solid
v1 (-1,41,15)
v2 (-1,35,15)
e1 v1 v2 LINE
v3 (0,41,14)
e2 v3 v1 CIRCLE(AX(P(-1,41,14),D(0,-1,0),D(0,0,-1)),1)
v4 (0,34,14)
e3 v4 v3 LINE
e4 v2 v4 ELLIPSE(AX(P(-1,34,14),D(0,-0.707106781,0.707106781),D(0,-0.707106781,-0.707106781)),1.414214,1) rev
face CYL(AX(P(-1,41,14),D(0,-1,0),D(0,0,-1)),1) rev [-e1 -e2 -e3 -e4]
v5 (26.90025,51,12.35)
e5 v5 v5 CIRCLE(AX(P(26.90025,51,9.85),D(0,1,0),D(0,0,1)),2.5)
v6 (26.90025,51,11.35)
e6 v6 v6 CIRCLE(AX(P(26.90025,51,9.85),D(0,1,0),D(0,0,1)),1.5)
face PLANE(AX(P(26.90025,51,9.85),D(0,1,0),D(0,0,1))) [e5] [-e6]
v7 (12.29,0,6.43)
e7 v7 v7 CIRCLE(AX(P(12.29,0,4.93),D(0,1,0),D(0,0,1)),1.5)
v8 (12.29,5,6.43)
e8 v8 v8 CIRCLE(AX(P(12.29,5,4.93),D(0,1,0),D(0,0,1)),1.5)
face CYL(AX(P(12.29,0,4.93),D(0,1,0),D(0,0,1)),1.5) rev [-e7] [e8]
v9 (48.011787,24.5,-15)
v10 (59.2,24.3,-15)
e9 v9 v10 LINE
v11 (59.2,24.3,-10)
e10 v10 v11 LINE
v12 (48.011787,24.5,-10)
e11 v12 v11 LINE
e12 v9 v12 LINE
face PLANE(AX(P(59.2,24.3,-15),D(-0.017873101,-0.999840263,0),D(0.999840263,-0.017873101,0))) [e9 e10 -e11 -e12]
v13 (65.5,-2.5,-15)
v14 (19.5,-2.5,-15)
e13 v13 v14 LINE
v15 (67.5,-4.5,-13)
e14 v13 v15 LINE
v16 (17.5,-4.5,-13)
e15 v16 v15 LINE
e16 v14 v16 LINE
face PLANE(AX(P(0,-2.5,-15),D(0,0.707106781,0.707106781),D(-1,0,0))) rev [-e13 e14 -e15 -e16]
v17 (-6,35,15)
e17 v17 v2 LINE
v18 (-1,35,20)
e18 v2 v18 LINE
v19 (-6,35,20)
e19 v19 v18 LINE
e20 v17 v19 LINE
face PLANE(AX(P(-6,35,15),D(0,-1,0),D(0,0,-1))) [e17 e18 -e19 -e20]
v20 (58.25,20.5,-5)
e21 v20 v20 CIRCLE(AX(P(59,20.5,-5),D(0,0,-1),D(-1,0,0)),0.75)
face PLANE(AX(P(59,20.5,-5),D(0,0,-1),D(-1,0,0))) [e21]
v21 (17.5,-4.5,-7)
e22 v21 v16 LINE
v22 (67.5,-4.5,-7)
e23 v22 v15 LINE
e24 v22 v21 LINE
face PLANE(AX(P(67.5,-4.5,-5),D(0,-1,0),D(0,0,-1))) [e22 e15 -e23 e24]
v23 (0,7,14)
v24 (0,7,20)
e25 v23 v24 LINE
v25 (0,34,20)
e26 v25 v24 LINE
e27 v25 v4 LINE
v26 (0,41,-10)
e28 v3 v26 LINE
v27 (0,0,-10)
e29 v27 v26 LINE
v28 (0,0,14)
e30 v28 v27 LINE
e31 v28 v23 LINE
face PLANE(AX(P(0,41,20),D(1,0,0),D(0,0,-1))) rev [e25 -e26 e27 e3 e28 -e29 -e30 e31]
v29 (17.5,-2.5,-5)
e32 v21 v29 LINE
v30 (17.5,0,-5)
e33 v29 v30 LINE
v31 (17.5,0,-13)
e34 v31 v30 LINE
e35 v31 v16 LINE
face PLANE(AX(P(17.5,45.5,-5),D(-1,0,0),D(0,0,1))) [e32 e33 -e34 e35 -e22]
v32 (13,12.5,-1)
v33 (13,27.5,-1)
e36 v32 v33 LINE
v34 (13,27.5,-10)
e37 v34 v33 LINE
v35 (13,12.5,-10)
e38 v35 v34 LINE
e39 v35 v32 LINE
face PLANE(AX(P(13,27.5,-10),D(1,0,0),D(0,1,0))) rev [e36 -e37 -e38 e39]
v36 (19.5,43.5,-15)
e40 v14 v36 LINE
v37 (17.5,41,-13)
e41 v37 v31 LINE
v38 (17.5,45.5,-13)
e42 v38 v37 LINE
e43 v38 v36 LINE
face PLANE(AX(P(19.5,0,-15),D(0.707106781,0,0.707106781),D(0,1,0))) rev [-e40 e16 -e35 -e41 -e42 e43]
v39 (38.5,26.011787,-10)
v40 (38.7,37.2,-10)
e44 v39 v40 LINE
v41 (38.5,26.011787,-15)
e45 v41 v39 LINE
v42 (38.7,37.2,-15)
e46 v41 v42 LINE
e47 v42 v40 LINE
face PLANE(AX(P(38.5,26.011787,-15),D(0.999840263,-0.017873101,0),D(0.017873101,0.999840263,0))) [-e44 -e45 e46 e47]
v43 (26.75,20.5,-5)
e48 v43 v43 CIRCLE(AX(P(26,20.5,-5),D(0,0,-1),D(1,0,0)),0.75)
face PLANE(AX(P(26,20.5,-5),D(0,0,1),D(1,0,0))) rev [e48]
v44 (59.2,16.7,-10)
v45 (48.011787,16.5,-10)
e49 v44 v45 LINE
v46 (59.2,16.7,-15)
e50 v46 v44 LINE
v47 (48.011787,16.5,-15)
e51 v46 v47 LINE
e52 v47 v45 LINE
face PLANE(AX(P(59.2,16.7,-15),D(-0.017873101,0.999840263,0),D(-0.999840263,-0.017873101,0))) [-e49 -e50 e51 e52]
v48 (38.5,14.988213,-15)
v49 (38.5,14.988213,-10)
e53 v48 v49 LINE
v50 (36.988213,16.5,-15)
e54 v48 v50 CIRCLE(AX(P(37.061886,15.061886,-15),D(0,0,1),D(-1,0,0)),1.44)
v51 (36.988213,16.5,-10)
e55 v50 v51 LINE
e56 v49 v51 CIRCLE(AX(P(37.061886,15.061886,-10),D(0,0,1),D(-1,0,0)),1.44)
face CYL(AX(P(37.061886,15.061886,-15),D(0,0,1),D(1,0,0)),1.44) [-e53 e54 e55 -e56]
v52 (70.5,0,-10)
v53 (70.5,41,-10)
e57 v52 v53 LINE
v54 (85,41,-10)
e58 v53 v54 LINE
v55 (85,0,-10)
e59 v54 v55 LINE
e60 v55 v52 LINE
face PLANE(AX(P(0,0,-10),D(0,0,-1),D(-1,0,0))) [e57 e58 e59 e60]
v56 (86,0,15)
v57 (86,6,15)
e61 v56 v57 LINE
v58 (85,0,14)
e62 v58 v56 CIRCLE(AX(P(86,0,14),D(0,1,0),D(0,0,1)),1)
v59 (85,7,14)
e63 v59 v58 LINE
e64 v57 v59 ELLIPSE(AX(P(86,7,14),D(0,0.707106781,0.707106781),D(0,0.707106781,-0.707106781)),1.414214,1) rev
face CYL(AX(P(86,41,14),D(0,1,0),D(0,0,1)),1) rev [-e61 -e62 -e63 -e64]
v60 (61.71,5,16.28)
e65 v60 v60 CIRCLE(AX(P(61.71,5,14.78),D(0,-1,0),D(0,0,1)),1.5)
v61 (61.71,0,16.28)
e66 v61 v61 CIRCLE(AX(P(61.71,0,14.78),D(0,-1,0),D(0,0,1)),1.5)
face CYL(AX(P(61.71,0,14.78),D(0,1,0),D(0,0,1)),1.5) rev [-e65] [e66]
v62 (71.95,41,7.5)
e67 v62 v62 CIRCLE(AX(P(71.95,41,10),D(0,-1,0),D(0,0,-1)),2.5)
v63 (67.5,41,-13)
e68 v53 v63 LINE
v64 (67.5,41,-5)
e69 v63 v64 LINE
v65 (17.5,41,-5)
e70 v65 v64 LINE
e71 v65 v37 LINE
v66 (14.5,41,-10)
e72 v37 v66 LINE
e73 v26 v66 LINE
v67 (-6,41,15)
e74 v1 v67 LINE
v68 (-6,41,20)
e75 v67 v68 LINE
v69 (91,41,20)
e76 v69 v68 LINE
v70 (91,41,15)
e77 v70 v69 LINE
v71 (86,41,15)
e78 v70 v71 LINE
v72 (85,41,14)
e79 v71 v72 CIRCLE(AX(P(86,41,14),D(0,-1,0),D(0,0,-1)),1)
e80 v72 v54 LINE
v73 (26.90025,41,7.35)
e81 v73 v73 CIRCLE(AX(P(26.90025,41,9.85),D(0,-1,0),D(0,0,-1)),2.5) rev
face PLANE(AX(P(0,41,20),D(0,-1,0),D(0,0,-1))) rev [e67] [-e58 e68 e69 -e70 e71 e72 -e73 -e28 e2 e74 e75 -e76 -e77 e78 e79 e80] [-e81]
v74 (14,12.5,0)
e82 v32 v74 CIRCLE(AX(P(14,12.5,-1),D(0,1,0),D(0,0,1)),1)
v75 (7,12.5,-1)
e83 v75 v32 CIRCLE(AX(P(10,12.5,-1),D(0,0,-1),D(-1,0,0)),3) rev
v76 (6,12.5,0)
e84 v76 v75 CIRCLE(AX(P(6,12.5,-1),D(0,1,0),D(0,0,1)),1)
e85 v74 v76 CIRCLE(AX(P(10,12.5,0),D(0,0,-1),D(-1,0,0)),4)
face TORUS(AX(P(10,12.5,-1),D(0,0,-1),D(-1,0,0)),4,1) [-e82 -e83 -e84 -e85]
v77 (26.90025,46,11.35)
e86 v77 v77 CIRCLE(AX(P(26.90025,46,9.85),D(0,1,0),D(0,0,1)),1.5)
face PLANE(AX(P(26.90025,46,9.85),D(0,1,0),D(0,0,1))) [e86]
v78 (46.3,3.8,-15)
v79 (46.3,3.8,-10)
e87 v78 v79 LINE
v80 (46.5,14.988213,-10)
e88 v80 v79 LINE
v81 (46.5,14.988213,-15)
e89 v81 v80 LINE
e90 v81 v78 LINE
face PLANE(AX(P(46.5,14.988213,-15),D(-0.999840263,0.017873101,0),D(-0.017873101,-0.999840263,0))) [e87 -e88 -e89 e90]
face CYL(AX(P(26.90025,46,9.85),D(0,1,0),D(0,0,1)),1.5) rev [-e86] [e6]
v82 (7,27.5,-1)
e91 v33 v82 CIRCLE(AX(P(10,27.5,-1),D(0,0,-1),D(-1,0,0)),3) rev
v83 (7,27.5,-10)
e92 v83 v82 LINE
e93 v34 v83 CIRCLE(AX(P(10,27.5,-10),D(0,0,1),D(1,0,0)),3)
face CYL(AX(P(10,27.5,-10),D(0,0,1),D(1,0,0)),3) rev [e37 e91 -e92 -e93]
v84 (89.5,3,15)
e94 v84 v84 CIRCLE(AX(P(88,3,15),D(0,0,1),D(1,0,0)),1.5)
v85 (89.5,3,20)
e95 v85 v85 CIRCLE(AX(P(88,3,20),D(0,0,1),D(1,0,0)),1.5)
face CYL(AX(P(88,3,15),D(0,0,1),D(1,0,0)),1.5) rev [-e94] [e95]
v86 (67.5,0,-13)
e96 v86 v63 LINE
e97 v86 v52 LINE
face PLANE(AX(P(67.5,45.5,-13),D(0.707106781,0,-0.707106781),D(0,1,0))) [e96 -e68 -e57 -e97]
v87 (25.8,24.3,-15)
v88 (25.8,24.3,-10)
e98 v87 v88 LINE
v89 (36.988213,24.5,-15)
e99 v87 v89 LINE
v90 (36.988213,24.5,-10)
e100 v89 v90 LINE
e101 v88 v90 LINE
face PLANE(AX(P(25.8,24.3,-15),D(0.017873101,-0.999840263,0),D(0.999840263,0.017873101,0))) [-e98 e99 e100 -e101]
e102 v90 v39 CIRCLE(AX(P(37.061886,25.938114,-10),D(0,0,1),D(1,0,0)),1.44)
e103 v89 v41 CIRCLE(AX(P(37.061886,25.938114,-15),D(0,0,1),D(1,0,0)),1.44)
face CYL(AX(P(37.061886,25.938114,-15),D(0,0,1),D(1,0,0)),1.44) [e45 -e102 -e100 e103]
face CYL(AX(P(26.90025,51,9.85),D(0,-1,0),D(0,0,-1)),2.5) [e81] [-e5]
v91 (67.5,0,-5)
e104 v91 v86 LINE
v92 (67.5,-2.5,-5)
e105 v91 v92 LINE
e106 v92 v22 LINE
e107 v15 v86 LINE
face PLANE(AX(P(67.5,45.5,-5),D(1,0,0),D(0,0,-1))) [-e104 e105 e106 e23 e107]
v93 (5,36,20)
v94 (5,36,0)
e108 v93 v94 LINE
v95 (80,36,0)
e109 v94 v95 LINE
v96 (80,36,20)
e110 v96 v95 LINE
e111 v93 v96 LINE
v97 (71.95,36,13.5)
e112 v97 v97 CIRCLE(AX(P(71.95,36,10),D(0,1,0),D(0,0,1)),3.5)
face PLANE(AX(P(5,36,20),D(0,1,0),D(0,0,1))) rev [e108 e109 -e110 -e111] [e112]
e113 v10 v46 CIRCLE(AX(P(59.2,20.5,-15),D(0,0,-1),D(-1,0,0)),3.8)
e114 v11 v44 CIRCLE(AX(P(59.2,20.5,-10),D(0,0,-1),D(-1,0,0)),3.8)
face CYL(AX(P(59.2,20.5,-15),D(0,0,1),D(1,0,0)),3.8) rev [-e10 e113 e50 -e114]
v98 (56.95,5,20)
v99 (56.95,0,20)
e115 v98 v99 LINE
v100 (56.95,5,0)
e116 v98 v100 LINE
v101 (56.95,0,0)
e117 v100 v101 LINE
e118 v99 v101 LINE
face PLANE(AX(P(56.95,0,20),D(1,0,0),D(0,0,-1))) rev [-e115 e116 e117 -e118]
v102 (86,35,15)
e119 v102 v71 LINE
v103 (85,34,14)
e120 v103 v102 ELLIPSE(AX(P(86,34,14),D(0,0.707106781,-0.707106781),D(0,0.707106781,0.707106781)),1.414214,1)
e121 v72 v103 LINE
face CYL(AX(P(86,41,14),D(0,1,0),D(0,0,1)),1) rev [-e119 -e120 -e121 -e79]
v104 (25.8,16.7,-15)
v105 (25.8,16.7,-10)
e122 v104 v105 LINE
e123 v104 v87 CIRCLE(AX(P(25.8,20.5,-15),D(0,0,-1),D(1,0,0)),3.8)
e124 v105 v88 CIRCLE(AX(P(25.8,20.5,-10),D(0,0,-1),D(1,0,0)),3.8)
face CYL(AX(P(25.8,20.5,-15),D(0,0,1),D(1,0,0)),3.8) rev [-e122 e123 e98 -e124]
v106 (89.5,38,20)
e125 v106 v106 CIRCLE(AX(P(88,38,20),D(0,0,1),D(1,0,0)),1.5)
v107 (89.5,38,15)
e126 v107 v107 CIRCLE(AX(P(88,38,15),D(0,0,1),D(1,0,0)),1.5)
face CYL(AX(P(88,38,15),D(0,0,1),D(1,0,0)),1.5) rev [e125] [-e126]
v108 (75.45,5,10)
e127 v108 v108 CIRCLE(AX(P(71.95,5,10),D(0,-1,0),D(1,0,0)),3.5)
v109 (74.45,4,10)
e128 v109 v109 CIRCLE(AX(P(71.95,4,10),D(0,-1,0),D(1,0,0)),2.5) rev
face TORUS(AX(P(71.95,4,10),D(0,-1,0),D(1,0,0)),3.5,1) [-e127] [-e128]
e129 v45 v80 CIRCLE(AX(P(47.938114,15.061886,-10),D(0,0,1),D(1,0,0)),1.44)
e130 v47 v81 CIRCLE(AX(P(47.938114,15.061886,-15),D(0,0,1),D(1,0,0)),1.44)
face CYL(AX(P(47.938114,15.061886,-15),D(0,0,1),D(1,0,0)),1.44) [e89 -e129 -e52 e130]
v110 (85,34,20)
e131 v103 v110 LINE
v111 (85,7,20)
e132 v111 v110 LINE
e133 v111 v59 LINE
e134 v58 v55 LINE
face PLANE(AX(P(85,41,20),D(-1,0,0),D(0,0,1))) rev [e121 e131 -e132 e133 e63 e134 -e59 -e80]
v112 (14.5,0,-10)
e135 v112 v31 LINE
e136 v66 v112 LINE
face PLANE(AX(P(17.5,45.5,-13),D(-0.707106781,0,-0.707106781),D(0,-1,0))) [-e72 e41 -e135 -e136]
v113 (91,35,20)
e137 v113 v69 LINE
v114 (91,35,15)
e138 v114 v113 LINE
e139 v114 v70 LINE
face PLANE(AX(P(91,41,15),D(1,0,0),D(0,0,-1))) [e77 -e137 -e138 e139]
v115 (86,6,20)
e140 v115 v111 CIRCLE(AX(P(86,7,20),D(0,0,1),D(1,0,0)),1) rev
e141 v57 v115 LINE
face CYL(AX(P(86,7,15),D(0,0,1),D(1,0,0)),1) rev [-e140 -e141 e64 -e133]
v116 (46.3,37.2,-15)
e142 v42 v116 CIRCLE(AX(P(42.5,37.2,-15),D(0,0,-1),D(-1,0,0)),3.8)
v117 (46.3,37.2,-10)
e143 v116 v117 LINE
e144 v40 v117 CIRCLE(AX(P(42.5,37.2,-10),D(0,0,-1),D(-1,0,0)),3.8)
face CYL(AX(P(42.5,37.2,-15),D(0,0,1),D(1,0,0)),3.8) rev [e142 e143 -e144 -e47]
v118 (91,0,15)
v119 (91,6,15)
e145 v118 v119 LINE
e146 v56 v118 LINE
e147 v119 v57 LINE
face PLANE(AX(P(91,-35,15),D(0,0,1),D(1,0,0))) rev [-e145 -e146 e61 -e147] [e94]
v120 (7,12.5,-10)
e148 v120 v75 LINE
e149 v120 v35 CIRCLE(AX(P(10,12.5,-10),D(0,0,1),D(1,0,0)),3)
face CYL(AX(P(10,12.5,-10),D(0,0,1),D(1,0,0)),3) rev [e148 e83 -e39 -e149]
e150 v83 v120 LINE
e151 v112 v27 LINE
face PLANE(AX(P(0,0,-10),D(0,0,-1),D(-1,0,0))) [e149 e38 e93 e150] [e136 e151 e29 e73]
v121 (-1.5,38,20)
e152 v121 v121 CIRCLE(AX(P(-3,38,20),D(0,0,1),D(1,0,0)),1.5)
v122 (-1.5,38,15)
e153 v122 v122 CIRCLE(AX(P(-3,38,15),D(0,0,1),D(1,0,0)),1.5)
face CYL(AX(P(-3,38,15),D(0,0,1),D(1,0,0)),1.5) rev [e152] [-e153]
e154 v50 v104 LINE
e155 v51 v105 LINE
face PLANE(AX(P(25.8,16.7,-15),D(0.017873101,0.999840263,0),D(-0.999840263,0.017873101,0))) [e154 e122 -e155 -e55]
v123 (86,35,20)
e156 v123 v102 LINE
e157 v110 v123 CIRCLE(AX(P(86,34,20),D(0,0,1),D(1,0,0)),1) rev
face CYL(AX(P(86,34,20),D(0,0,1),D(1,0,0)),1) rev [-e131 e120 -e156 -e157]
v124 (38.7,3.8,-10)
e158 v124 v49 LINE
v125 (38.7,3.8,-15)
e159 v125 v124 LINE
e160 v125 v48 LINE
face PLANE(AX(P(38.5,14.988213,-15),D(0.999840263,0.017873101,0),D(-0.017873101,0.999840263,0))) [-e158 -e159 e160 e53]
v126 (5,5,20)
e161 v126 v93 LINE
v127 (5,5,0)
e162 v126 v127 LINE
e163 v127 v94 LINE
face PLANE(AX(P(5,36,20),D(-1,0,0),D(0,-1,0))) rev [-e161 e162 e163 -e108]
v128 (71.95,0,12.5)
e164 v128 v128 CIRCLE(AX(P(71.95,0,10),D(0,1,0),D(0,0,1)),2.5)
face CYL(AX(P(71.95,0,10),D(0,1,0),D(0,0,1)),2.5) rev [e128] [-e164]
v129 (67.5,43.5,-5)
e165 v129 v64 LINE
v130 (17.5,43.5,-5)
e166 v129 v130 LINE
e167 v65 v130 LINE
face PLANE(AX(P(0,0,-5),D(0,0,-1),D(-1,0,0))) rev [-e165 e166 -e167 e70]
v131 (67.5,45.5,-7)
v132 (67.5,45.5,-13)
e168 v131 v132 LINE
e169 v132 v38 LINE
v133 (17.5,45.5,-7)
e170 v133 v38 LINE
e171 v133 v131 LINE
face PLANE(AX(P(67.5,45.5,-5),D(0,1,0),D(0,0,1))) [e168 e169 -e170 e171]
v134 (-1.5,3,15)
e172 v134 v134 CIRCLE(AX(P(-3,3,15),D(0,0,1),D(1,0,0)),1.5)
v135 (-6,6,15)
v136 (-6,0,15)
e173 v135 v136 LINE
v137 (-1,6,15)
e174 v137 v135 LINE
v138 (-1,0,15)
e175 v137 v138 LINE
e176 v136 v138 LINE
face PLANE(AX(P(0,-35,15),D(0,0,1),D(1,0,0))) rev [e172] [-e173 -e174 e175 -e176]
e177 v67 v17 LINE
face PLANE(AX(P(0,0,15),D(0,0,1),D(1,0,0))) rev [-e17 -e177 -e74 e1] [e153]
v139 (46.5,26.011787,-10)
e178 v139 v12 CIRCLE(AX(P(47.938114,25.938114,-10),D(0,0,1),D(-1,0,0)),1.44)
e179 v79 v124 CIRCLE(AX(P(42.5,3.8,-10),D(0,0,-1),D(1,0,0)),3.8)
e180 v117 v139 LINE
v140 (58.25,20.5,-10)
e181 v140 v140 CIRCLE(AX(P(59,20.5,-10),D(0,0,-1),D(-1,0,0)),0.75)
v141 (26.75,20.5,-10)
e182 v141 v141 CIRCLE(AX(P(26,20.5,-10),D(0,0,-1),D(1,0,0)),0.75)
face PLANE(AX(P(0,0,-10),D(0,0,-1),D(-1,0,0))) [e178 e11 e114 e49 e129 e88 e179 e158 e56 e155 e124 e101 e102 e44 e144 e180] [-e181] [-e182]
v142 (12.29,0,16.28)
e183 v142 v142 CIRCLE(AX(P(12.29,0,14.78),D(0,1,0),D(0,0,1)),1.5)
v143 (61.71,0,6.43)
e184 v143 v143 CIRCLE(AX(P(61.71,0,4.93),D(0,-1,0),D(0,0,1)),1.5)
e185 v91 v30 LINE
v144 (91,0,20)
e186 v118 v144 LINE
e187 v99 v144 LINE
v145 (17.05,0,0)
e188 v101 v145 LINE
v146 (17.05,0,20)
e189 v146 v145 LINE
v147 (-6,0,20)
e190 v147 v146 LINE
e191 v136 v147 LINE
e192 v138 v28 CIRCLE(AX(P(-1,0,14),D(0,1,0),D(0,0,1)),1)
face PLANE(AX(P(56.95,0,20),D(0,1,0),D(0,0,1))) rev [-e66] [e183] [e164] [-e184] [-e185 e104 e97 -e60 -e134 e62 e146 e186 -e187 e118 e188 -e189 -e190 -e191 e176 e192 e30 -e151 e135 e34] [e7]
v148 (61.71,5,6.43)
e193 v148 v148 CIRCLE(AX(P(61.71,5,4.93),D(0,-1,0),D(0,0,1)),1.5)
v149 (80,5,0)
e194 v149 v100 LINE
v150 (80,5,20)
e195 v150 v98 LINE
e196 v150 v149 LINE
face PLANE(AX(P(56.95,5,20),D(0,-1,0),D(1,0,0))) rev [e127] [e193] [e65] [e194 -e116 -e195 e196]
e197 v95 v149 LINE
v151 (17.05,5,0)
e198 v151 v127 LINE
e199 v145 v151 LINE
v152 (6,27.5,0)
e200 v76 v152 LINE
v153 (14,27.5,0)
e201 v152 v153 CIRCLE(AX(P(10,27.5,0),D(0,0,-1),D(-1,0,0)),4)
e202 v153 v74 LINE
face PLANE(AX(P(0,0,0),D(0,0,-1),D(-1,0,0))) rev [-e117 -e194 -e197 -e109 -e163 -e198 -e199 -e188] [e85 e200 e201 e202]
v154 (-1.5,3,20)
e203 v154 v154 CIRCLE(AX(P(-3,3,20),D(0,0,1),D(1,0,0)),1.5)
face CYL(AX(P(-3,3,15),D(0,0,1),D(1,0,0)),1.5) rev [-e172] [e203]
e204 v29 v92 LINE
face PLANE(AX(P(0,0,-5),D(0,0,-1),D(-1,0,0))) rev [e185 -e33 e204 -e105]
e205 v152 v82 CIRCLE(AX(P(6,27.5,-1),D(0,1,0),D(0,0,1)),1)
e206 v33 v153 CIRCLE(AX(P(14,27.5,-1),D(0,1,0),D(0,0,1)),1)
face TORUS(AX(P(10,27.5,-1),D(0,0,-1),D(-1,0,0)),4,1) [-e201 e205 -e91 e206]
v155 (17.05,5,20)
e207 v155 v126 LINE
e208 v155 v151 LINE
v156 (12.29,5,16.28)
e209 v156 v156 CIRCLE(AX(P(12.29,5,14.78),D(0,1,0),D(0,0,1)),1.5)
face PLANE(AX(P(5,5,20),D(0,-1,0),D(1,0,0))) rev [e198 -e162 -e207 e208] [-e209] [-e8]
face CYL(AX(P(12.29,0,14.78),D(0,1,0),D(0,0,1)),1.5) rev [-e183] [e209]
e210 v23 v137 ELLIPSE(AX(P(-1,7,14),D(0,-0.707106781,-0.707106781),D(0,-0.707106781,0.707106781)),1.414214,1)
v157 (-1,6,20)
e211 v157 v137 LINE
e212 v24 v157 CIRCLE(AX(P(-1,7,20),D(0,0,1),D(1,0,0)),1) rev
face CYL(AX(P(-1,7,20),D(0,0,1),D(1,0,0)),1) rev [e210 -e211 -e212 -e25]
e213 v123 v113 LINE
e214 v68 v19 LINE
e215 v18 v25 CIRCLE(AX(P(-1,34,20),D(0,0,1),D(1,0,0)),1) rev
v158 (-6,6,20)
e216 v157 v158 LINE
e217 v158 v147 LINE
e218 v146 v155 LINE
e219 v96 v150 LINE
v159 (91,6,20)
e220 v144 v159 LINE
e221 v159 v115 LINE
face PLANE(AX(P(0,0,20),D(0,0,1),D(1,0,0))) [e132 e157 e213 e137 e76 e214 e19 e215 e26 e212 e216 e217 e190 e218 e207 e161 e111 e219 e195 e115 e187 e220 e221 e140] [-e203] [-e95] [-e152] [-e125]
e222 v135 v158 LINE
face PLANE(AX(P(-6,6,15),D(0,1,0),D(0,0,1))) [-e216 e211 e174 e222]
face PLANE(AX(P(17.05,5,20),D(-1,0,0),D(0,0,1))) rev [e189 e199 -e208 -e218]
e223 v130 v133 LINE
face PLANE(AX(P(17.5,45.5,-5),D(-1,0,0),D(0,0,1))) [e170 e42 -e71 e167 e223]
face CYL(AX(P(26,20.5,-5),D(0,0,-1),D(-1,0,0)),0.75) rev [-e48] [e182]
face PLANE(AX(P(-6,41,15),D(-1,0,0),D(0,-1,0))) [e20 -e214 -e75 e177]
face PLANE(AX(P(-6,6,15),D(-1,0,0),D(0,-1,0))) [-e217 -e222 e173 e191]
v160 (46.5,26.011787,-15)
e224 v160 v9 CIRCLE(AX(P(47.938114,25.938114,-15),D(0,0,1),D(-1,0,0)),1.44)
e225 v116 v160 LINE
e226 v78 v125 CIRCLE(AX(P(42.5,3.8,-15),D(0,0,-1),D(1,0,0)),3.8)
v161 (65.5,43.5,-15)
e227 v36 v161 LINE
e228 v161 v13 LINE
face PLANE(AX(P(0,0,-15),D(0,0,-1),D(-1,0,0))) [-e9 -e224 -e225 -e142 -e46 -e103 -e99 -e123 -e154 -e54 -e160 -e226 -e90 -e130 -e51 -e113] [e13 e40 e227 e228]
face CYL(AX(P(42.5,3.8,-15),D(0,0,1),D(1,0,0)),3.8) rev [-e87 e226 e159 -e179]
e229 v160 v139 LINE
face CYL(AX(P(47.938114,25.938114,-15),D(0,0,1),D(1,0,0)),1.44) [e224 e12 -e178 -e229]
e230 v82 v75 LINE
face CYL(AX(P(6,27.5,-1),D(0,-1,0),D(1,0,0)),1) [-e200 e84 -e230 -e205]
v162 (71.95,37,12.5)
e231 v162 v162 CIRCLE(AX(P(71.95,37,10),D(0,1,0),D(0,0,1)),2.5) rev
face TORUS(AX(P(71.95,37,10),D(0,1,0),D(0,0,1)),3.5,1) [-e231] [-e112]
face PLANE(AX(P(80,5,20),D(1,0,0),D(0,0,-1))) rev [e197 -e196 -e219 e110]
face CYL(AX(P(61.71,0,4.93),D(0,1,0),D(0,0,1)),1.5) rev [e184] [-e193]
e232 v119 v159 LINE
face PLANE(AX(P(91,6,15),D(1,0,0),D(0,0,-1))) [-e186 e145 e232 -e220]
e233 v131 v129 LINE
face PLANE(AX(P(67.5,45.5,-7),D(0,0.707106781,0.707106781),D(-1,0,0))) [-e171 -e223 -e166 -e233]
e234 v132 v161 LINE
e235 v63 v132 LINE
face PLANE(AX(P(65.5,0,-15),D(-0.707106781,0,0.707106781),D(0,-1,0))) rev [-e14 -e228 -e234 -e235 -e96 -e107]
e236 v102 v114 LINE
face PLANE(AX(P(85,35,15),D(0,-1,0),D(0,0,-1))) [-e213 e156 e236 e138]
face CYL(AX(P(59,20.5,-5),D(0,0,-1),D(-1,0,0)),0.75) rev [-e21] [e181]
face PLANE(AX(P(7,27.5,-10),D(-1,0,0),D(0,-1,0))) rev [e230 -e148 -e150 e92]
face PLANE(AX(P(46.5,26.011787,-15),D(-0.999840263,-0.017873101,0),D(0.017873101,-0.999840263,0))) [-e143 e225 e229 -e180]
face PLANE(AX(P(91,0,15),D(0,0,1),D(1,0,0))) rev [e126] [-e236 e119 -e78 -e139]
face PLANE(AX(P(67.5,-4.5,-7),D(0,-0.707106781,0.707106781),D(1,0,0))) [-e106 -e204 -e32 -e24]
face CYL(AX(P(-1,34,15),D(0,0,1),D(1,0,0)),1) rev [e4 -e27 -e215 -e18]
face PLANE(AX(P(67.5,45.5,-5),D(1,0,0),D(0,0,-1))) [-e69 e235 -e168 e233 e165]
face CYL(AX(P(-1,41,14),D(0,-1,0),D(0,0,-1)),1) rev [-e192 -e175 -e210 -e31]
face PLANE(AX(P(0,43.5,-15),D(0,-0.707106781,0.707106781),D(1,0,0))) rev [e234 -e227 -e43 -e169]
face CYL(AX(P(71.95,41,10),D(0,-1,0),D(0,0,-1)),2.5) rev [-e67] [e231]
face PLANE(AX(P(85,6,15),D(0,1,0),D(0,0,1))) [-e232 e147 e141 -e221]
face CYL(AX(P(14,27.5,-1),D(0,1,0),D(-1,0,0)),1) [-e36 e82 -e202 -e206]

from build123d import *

# Parameters (mm, degrees)
BOSS_EXTRUDE3_DEPTH  = 20
SKETCH4_W            = 85
SKETCH4_H            = 41
BOSS_EXTRUDE4_DEPTH  = 10
SKETCH5_R            = 2.5
CUT_EXTRUDE1_DEPTH   = 5
CUT_EXTRUDE2_START   = -5
SKETCH6_R            = 2.5
CUT_EXTRUDE2_DEPTH   = 5
FILLET2_R            = 1
SKETCH7_R            = 1.5
CUT_EXTRUDE3_DEPTH   = 5
CUT_EXTRUDE4_DEPTH   = 10
FILLET3_R            = 1
SKETCH10_W           = 50
SKETCH10_H           = 50
BOSS_EXTRUDE7_DEPTH  = 5
SKETCH9_W            = 50
SKETCH9_H            = 50
BOSS_EXTRUDE8_DEPTH  = 5
SKETCH11_R           = 0.75
CUT_EXTRUDE5_DEPTH   = 5
CHAMFER1_SIZE        = 2
CHAMFER2_SIZE        = 3
SKETCH15_W           = 6
SKETCH15_H           = 6
SKETCH15_R           = 1.5
BOSS_EXTRUDE11_DEPTH = 5
LPATTERN1_COUNT      = 2
LPATTERN1_PITCH      = 35
LPATTERN1_COUNT_DIR2 = 2
LPATTERN1_PITCH_DIR2 = 91
FILLET5_R            = 1
SKETCH16_R           = 2.5
BOSS_EXTRUDE12_DEPTH = 10
SKETCH17_R           = 1.5
CUT_EXTRUDE8_DEPTH   = 5


with BuildPart() as part:
    # Sketch3 → Boss-Extrude3 (new body)
    with BuildSketch(Plane.XY):
        Polygon((5, 36), (5, 5), (17.05, 5), (17.05, 0), (0, 0), (0, 41), (5, 41), (80, 41), (85, 41), (85, 0), (56.95, 0), (56.95, 5), (80, 5), (80, 36), align=None)
    extrude(amount=BOSS_EXTRUDE3_DEPTH)

    # Sketch4 → Boss-Extrude4 (add)
    with BuildSketch(Plane(origin=(0, 0, 0), x_dir=(-1, 0, 0), z_dir=(0, 0, -1))):
        with Locations((-42.5, 20.5)):
            Rectangle(SKETCH4_W, SKETCH4_H)
    extrude(amount=BOSS_EXTRUDE4_DEPTH)

    # Sketch5 → Cut-Extrude1 (cut)
    with BuildSketch(Plane(origin=(0, 5, 0), x_dir=(1, 0, 0), z_dir=(0, 1, 0))):
        with Locations(Location((71.95, -10, 0), (0, 0, 270))):
            Circle(SKETCH5_R)
    extrude(amount=-CUT_EXTRUDE1_DEPTH, mode=Mode.SUBTRACT)

    # Sketch6 → Cut-Extrude2 (cut)
    with BuildSketch(Plane.XZ.offset(-36).offset(CUT_EXTRUDE2_START)):
        with Locations(Location((71.95, 10, 0), (0, 0, 90))):
            Circle(SKETCH6_R)
    extrude(amount=CUT_EXTRUDE2_DEPTH, mode=Mode.SUBTRACT)

    # Fillet2
    fillet2_edges = [part.edges().sort_by_distance(p)[0] for p in [
        (71.95, 5, 7.5),
        (71.95, 36, 7.5),
    ]]
    fillet(fillet2_edges, radius=FILLET2_R)

    # Sketch7 → Cut-Extrude3 (cut)
    with BuildSketch(Plane(origin=(0, 5, 0), x_dir=(1, 0, 0), z_dir=(0, 1, 0))):
        with Locations(Location((12.29, -4.93, 0), (0, 0, 270))):
            Circle(SKETCH7_R)
        with Locations(Location((12.29, -14.78, 0), (0, 0, 270))):
            Circle(SKETCH7_R)
    cut_extrude3 = extrude(amount=-CUT_EXTRUDE3_DEPTH, mode=Mode.SUBTRACT)

    # Mirror1: Cut-Extrude3 across plane
    add(cut_extrude3.mirror(Plane(origin=(37, 0, 0), x_dir=(0, 0, 1), z_dir=(1, 0, 0))), mode=Mode.SUBTRACT)

    # Sketch8 → Cut-Extrude4 (cut)
    with BuildSketch(Plane.XY):
        with BuildLine():
            Line((13, 27.5), (13, 12.5))
            ThreePointArc((13, 12.5), (10, 9.5), (7, 12.5))
            Line((7, 12.5), (7, 27.5))
            ThreePointArc((7, 27.5), (10, 30.5), (13, 27.5))
        make_face()
    extrude(amount=-CUT_EXTRUDE4_DEPTH, mode=Mode.SUBTRACT)

    # Fillet3
    fillet3_edges = [part.edges().sort_by_distance(p)[0] for p in [
        (10, 30.5, 0),
        (7, 20, 0),
        (10, 9.5, 0),
        (13, 20, 0),
    ]]
    fillet(fillet3_edges, radius=FILLET3_R)

    # Sketch10 → Boss-Extrude7 (add)
    with BuildSketch(Plane(origin=(0, 0, -10), x_dir=(-1, 0, 0), z_dir=(0, 0, -1))):
        with Locations((-42.5, 20.5)):
            Rectangle(SKETCH10_W, SKETCH10_H)
    extrude(amount=-BOSS_EXTRUDE7_DEPTH)

    # Sketch9 → Boss-Extrude8 (add)
    with BuildSketch(Plane(origin=(0, 0, -10), x_dir=(-1, 0, 0), z_dir=(0, 0, -1))):
        with Locations((-42.5, 20.5)):
            Rectangle(SKETCH9_W, SKETCH9_H)
        with BuildLine():
            Line((-59.2, 24.3), (-48.011787453, 24.5))
            ThreePointArc((-48.011787453, 24.5), (-46.919880362, 24.919880362), (-46.5, 26.011787453))
            Line((-46.5, 26.011787453), (-46.3, 37.2))
            ThreePointArc((-46.3, 37.2), (-42.5, 41), (-38.7, 37.2))
            Line((-38.7, 37.2), (-38.5, 26.011787453))
            ThreePointArc((-38.5, 26.011787453), (-38.080119638, 24.919880362), (-36.988212547, 24.5))
            Line((-36.988212547, 24.5), (-25.8, 24.3))
            ThreePointArc((-25.8, 24.3), (-22, 20.5), (-25.8, 16.7))
            Line((-25.8, 16.7), (-36.988212547, 16.5))
            ThreePointArc((-36.988212547, 16.5), (-38.080119638, 16.080119638), (-38.5, 14.988212547))
            Line((-38.5, 14.988212547), (-38.7, 3.8))
            ThreePointArc((-38.7, 3.8), (-42.5, 0), (-46.3, 3.8))
            Line((-46.3, 3.8), (-46.5, 14.988212547))
            ThreePointArc((-46.5, 14.988212547), (-46.919880362, 16.080119638), (-48.011787453, 16.5))
            Line((-48.011787453, 16.5), (-59.2, 16.7))
            ThreePointArc((-59.2, 16.7), (-63, 20.5), (-59.2, 24.3))
        make_face(mode=Mode.SUBTRACT)
    extrude(amount=BOSS_EXTRUDE8_DEPTH)

    # Sketch11 → Cut-Extrude5 (cut)
    with BuildSketch(Plane(origin=(0, 0, -10), x_dir=(-1, 0, 0), z_dir=(0, 0, -1))):
        with Locations((-59, 20.5)):
            Circle(SKETCH11_R)
        with Locations(Location((-26, 20.5, 0), (0, 0, 180))):
            Circle(SKETCH11_R)
    extrude(amount=-CUT_EXTRUDE5_DEPTH, mode=Mode.SUBTRACT)

    # Chamfer1
    chamfer1_edges = [part.edges().sort_by_distance(p)[0] for p in [
        (42.5, 45.5, -5),
        (42.5, -4.5, -5),
        (67.5, 20.5, -15),
        (42.5, -4.5, -15),
        (17.5, 20.5, -15),
        (42.5, 45.5, -15),
    ]]
    chamfer(chamfer1_edges, length=CHAMFER1_SIZE)

    # Chamfer2
    chamfer2_edges = [part.edges().sort_by_distance(p)[0] for p in [
        (17.5, 20.5, -10),
        (67.5, 20.5, -10),
    ]]
    chamfer(chamfer2_edges, length=CHAMFER2_SIZE - 0.0001)  # a hair under: the kernel refuses the full size

    # Sketch15 → Boss-Extrude11 (add)
    with BuildSketch(Plane.XY.offset(20)):
        with Locations((-3, 38)):
            Rectangle(SKETCH15_W, SKETCH15_H)
        with Locations((-3, 38)):
            Circle(SKETCH15_R, mode=Mode.SUBTRACT)
    boss_extrude11 = extrude(amount=-BOSS_EXTRUDE11_DEPTH)

    # LPattern1: Boss-Extrude11 2 × 2
    with Locations(*[(j * LPATTERN1_PITCH_DIR2, -i * LPATTERN1_PITCH, 0) for i in range(LPATTERN1_COUNT) for j in range(LPATTERN1_COUNT_DIR2) if (i, j) != (0, 0)]):
        add(boss_extrude11)

    # Fillet5
    fillet5_edges = [part.edges().sort_by_distance(p)[0] for p in [
        (0, 38, 15),
        (0, 35, 17.5),
        (85, 38, 15),
        (85, 35, 17.5),
        (0, 3, 15),
        (0, 6, 17.5),
        (85, 3, 15),
        (85, 6, 17.5),
    ]]
    fillet(fillet5_edges, radius=FILLET5_R)

    # Sketch16 → Boss-Extrude12 (add)
    with BuildSketch(Plane(origin=(0, 41, 0), x_dir=(1, 0, 0), z_dir=(0, 1, 0))):
        with Locations(Location((26.900249723, -9.85, 0), (0, 0, 90))):
            Circle(SKETCH16_R)
    extrude(amount=BOSS_EXTRUDE12_DEPTH)

    # Sketch17 → Cut-Extrude8 (cut)
    with BuildSketch(Plane(origin=(0, 51, 0), x_dir=(1, 0, 0), z_dir=(0, 1, 0))):
        with Locations(Location((26.900249723, -9.85, 0), (0, 0, 270))):
            Circle(SKETCH17_R)
    extrude(amount=-CUT_EXTRUDE8_DEPTH, mode=Mode.SUBTRACT)


solid = part.part
